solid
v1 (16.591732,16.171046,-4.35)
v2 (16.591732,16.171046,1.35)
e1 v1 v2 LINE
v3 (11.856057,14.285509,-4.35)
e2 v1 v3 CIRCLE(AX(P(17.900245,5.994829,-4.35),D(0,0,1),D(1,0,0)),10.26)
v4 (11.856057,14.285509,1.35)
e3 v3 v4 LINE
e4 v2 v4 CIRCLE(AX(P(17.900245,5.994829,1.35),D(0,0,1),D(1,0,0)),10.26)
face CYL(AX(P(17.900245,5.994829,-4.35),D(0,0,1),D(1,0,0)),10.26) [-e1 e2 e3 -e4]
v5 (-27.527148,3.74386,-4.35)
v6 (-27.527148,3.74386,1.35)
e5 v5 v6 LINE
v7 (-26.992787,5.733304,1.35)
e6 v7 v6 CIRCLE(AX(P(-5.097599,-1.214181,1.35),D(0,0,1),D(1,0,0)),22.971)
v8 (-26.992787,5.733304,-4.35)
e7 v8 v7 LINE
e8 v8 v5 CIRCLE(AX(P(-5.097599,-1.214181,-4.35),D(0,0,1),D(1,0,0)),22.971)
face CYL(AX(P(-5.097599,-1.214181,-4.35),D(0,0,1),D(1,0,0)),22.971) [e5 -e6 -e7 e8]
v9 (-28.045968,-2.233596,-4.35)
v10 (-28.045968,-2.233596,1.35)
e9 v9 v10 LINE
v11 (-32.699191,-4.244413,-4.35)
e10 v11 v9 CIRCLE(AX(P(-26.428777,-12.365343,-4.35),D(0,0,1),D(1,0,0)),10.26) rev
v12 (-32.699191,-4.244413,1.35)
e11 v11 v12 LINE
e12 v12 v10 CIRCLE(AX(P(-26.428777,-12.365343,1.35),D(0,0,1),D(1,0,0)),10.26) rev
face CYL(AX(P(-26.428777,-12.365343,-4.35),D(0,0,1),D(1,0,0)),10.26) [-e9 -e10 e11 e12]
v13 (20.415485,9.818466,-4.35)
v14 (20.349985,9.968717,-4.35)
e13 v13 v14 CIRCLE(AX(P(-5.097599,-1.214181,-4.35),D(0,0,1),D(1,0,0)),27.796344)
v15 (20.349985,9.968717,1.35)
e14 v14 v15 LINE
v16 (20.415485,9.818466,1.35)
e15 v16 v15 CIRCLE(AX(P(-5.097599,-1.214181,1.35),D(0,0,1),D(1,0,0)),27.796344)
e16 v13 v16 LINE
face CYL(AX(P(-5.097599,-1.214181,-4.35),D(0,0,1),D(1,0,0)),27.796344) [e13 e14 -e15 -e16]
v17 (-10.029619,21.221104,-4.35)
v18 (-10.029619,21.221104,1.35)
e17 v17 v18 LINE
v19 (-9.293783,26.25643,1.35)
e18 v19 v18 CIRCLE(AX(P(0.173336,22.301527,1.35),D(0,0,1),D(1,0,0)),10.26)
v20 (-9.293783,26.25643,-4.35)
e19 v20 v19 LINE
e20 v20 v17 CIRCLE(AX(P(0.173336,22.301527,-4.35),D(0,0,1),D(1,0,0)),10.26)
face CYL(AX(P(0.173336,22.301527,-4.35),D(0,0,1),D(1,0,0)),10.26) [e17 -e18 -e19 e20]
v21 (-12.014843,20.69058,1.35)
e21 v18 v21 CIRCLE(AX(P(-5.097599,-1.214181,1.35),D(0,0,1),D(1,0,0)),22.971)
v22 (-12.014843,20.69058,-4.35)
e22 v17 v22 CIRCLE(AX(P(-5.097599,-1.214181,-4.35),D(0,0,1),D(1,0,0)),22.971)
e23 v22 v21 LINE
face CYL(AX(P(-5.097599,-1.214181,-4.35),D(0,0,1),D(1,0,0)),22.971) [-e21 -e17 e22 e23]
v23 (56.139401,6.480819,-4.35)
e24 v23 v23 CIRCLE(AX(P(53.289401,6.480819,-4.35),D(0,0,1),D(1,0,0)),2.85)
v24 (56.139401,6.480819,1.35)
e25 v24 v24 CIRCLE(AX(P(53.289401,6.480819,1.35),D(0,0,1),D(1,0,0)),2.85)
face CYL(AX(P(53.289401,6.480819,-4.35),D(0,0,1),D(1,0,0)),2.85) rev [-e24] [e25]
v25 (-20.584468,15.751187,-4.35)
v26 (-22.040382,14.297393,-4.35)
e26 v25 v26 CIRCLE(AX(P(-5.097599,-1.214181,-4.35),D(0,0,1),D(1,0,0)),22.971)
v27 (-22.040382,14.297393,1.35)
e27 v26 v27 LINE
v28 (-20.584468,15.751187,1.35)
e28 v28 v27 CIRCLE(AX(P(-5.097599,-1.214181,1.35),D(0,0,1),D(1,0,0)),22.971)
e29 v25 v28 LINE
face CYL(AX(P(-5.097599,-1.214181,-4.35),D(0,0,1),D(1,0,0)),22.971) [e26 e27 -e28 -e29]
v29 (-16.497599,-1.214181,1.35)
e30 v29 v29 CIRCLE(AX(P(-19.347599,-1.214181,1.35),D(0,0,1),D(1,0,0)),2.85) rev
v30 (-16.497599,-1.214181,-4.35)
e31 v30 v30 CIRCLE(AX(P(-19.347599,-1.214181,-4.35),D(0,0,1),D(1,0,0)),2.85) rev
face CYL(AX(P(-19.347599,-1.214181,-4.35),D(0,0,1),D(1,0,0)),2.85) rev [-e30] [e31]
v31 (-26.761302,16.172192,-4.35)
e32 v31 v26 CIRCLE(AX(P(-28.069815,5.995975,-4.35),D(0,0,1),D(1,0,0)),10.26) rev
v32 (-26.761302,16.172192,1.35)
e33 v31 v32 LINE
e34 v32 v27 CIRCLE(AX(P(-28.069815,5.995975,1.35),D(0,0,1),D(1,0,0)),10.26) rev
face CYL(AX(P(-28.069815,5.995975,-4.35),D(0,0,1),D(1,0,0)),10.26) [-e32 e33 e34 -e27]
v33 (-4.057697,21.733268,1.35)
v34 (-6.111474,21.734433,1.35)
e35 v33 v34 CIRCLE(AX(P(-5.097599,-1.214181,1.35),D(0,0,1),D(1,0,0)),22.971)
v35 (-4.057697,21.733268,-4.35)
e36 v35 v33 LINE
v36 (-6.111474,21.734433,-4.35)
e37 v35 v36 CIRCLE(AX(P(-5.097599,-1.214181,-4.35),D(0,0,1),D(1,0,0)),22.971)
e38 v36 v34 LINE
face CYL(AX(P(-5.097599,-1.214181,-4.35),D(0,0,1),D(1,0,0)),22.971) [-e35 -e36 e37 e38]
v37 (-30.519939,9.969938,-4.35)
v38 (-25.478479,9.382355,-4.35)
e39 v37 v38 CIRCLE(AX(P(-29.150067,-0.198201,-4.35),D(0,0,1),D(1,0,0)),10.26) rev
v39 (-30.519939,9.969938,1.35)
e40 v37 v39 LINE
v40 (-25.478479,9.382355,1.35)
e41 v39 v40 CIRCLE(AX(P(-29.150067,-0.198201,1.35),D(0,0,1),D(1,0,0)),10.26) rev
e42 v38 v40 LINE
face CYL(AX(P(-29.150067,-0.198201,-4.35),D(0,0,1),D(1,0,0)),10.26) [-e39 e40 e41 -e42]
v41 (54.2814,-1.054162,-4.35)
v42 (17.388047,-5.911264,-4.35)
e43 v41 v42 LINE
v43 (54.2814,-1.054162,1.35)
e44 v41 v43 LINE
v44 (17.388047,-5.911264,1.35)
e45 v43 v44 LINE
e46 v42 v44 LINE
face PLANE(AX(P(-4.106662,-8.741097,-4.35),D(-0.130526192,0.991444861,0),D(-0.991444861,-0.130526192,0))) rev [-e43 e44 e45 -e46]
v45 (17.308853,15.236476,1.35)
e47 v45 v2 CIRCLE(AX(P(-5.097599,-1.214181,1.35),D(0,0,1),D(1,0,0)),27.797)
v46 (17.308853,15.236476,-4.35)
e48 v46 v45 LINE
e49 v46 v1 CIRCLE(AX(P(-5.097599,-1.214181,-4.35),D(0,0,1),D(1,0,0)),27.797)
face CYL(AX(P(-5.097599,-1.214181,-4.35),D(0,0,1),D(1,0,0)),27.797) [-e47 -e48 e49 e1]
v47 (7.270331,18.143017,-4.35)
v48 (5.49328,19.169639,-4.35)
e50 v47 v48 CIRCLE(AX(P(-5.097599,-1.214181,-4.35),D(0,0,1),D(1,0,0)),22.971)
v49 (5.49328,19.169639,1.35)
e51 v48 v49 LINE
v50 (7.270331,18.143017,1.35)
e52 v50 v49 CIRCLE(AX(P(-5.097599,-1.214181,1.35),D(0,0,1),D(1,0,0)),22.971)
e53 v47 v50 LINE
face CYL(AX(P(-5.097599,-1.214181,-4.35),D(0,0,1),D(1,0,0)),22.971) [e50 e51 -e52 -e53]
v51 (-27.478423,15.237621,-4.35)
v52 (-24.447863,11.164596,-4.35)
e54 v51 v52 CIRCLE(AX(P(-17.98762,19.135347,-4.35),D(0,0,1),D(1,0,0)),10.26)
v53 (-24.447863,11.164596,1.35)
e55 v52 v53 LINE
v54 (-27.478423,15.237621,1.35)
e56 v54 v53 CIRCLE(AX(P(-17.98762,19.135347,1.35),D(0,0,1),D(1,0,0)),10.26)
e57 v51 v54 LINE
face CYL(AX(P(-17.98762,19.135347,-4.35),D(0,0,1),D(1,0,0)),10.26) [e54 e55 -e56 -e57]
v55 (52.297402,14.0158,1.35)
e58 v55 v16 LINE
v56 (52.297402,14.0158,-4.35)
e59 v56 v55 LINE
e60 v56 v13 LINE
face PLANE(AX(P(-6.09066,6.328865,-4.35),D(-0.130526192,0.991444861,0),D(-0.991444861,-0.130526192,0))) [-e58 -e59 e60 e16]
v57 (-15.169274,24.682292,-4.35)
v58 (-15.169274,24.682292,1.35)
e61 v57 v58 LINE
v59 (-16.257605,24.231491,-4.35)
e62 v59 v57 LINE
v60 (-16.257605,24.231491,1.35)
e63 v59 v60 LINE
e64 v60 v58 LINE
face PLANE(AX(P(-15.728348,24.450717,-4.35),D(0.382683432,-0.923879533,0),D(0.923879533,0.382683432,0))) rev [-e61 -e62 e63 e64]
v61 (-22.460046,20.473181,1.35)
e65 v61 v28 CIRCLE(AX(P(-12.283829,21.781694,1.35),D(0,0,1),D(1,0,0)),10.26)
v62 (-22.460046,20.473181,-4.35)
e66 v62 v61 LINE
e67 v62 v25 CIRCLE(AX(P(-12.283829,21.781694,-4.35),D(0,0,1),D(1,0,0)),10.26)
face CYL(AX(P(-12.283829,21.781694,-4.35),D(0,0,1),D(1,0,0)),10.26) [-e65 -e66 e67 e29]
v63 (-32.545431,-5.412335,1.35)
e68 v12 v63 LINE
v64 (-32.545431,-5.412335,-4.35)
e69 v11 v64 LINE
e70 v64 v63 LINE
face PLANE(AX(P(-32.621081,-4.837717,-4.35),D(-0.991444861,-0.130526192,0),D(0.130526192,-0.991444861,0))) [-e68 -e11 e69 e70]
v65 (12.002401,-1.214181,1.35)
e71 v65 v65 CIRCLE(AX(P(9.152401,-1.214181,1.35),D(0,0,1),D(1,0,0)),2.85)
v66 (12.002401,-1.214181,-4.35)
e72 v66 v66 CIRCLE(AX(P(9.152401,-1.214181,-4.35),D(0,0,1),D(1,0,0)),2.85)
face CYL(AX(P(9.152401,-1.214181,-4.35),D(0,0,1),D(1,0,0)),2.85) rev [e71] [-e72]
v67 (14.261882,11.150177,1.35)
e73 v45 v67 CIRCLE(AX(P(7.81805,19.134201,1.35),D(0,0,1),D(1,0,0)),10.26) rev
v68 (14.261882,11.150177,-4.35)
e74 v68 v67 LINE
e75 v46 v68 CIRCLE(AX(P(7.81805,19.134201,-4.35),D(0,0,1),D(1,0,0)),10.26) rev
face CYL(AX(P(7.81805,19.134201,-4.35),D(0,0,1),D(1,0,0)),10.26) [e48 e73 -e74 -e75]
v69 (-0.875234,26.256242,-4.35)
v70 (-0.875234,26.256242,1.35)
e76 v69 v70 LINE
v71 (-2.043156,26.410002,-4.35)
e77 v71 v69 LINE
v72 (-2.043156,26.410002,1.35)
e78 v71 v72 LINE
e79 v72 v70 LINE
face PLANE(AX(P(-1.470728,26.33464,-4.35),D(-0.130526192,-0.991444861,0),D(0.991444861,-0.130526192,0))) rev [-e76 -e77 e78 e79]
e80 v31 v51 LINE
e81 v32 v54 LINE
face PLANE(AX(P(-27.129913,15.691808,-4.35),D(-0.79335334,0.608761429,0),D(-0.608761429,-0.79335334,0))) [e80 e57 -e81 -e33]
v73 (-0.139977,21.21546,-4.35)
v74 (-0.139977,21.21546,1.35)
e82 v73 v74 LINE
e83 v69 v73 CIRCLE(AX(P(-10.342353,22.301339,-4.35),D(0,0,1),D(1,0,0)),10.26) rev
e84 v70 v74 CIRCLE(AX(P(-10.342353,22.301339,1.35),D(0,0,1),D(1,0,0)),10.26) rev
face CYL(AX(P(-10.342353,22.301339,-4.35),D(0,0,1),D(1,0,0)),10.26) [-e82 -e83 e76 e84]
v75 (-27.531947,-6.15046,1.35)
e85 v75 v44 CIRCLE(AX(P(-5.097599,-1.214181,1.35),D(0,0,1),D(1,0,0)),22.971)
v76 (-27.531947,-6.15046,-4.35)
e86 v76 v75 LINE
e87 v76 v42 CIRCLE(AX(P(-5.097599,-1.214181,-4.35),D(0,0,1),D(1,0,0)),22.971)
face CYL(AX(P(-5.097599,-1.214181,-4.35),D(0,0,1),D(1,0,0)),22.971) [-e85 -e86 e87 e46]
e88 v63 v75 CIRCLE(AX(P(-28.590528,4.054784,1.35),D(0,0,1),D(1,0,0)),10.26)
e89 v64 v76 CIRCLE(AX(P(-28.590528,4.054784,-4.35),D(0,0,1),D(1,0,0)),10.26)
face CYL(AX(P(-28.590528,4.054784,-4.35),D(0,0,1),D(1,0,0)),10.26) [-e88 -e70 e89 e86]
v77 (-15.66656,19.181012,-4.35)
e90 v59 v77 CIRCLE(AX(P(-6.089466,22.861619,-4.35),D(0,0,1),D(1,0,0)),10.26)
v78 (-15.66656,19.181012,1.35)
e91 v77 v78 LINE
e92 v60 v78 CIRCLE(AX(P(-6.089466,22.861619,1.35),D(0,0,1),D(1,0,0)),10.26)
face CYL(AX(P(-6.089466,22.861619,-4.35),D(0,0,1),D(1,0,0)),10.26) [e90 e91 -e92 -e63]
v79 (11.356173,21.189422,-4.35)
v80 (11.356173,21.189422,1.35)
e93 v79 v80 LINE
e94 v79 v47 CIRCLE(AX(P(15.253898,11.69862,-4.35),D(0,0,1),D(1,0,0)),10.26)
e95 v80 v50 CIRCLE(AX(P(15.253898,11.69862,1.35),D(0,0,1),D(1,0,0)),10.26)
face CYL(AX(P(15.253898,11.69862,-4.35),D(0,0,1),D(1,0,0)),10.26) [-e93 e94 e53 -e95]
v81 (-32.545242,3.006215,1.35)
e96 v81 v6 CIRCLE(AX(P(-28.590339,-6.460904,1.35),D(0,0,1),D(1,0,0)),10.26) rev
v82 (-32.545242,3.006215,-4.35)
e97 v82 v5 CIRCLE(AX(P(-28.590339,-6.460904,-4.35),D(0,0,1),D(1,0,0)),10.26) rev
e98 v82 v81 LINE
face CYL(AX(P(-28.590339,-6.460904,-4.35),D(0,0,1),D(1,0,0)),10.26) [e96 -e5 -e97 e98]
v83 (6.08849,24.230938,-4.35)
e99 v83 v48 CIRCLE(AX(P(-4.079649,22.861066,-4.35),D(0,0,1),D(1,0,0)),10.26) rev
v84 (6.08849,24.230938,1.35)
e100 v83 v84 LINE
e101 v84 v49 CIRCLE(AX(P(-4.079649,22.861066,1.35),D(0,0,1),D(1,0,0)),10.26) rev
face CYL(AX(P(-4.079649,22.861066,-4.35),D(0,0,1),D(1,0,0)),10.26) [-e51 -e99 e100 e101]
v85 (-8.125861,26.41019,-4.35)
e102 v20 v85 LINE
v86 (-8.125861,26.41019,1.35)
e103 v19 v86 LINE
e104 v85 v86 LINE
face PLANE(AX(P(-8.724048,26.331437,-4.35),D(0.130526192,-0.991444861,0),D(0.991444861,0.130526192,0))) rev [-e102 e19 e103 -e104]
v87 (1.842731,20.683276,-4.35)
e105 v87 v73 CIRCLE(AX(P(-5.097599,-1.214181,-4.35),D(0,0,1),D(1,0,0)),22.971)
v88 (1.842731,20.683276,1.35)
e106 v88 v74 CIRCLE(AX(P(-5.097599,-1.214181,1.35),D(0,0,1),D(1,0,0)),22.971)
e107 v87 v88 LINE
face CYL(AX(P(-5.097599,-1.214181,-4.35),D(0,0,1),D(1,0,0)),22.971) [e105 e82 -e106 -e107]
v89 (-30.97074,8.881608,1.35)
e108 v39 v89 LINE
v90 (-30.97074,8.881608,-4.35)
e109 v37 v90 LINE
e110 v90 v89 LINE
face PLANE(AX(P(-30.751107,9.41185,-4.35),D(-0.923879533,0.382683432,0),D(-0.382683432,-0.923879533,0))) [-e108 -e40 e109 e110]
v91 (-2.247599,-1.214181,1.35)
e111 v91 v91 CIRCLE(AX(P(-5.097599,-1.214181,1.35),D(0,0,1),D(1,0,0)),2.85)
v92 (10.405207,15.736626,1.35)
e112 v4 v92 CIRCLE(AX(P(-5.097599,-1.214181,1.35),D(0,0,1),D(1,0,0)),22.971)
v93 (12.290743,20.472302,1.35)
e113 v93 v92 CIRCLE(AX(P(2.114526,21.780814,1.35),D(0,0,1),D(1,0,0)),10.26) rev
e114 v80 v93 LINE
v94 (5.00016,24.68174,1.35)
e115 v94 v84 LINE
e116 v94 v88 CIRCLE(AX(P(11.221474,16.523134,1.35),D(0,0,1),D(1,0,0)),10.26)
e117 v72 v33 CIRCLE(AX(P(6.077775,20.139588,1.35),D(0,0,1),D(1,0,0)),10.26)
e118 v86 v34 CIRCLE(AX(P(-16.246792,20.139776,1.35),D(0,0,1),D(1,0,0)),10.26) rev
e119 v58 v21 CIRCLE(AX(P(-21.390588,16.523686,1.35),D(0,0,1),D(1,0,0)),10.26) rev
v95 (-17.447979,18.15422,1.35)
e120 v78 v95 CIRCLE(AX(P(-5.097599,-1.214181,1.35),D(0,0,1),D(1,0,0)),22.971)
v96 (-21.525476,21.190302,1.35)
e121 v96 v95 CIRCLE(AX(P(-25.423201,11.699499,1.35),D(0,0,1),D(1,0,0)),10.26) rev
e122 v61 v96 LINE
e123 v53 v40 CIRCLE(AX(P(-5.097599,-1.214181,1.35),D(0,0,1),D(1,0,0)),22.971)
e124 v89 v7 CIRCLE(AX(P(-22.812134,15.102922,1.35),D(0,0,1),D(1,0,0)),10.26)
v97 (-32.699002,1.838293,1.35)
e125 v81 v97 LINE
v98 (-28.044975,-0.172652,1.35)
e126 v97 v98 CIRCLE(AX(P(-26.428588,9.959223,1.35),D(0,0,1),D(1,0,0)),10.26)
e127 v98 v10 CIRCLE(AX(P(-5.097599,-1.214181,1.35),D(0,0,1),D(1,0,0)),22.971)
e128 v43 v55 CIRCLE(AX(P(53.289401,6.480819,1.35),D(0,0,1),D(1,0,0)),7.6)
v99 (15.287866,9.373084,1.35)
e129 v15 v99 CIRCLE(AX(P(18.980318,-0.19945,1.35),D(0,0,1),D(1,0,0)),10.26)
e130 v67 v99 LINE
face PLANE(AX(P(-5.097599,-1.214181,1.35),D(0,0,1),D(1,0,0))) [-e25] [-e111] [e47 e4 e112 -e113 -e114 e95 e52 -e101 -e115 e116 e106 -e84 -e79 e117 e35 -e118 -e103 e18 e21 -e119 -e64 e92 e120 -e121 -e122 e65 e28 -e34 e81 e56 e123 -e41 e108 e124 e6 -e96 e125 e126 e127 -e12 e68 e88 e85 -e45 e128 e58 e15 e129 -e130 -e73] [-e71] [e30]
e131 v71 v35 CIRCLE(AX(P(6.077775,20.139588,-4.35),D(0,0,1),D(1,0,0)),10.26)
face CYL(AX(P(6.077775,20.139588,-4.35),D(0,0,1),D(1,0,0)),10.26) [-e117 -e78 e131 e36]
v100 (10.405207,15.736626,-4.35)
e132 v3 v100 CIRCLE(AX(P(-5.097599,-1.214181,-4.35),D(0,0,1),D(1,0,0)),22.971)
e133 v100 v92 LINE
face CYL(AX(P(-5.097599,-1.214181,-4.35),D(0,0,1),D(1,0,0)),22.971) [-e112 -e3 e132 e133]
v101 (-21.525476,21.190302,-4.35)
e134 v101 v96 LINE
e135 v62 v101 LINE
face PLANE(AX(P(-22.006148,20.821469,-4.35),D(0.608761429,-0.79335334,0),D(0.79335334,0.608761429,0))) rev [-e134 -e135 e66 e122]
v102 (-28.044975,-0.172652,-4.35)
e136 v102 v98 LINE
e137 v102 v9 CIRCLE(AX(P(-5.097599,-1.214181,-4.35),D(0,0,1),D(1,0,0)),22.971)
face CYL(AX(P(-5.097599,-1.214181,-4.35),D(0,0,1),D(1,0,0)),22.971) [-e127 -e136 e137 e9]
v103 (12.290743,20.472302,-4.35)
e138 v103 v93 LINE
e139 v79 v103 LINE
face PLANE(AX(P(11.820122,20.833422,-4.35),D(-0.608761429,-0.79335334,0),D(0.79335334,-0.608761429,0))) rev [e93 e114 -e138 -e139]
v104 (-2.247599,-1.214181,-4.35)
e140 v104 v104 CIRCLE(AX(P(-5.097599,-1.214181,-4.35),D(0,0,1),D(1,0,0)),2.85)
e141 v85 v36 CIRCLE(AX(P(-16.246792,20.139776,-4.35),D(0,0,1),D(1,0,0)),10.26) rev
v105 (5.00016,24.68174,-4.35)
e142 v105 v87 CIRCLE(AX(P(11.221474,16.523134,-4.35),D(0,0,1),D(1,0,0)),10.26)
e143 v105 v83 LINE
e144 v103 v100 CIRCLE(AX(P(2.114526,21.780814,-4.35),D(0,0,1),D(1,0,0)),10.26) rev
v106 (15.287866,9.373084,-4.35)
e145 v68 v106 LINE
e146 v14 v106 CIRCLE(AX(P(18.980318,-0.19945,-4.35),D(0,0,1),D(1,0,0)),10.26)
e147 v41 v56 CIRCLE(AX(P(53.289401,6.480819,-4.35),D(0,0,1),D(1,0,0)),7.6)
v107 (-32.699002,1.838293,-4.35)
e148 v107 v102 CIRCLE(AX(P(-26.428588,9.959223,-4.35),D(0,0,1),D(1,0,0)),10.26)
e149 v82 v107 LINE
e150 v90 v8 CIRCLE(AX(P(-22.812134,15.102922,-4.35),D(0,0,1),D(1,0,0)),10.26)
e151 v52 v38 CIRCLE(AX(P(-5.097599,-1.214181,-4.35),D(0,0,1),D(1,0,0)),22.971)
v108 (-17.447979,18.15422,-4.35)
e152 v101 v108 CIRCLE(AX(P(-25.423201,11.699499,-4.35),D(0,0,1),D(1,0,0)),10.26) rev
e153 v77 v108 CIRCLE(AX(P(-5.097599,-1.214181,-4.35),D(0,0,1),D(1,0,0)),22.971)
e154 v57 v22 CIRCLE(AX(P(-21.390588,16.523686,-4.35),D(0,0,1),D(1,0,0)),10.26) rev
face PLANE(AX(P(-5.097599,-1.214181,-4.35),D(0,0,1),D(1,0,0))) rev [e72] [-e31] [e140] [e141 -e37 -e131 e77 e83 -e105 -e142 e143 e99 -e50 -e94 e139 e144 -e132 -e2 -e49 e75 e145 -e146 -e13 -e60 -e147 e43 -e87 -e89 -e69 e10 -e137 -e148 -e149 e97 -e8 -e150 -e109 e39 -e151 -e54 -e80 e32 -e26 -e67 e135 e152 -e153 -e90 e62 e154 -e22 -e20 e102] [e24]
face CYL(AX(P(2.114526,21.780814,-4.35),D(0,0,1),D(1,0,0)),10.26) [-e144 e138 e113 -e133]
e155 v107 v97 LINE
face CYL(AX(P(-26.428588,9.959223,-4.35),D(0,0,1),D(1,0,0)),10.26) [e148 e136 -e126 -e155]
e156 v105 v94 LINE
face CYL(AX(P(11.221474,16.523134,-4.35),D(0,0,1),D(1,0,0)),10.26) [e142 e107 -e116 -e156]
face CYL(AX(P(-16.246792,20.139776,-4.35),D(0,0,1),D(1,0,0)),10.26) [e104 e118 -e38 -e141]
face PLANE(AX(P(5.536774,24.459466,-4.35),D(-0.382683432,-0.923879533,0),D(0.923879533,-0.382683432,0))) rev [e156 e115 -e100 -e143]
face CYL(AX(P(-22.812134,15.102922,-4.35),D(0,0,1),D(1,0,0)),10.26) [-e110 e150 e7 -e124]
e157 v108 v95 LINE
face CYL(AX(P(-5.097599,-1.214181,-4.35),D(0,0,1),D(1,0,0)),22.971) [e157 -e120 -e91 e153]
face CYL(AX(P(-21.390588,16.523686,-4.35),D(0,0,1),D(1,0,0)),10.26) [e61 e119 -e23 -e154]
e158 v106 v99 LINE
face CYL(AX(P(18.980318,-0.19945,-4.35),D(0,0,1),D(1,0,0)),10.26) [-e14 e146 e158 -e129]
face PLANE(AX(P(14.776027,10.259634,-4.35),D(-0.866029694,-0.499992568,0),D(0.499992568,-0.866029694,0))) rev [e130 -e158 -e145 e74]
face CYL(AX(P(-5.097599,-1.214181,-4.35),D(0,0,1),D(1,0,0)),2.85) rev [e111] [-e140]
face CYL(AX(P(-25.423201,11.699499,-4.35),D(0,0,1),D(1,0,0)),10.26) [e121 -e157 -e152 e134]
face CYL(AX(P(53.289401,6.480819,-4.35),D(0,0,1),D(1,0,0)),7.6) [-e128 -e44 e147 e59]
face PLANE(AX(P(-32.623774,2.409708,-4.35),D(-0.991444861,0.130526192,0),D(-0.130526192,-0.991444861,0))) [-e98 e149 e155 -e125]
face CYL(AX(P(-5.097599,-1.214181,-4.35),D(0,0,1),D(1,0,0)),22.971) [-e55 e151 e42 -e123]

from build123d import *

# Parameters (mm, degrees)
BOSS_EXTRUDE1_START     = -3
BOSS_EXTRUDE1_OUTLINE_R = 1.5
BOSS_EXTRUDE1_DEPTH     = 3
SCALE1_SCALE            = 1.9


# Read off the part's stored shape, not the designer's step: Boss-Extrude1
with BuildPart() as part:
    # Boss-Extrude1 outline → Boss-Extrude1 (new body)
    with BuildSketch(Plane.XY.offset(BOSS_EXTRUDE1_START)):
        with BuildLine():
            Line((11.834550238, -2.472148997), (31.252104769, 0.084220555))
            ThreePointArc((31.252104769, 0.084220555), (34.695779445, 4.572104769), (30.207895231, 8.015779445))
            Line((30.207895231, 8.015779445), (13.427938823, 5.806656275))
            ThreePointArc((13.427938823, 5.806656275), (13.410760304, 5.846221532), (13.393465207, 5.885735968))
            ThreePointArc((13.393465207, 5.885735968), (12.041551488, 5.897071585), (10.729192217, 5.572244952))
            Line((10.729192217, 5.572244952), (10.189200244, 6.507557022))
            ThreePointArc((10.189200244, 6.507557022), (11.126720661, 7.481723913), (11.792869471, 8.658240563))
            ThreePointArc((11.792869471, 8.658240563), (11.606759368, 8.906179706), (11.415437385, 9.150119633))
            ThreePointArc((11.415437385, 9.150119633), (10.106597569, 8.81117421), (8.922976471, 8.15773197))
            ThreePointArc((8.922976471, 8.15773197), (8.549706323, 8.548135574), (8.159371308, 8.921477448))
            ThreePointArc((8.159371308, 8.921477448), (8.812813548, 10.105098546), (9.151758972, 11.413938362))
            Line((9.151758972, 11.413938362), (8.659879901, 11.791370448))
            ThreePointArc((8.659879901, 11.791370448), (7.483516811, 11.125336137), (6.509436976, 10.187999326))
            ThreePointArc((6.509436976, 10.187999326), (6.047829045, 10.468613272), (5.574146563, 10.728326528))
            ThreePointArc((5.574146563, 10.728326528), (5.898805358, 12.040487702), (5.887415057, 13.392168338))
            Line((5.887415057, 13.392168338), (5.314609747, 13.629432066))
            ThreePointArc((5.314609747, 13.629432066), (4.351003751, 12.681995862), (3.65280527, 11.524977816))
            ThreePointArc((3.65280527, 11.524977816), (3.134170467, 11.676689406), (2.609274564, 11.805074597))
            ThreePointArc((2.609274564, 11.805074597), (2.58305967, 13.15599481), (2.222297371, 14.458117388))
            Line((2.222297371, 14.458117388), (1.607601557, 14.539043627))
            ThreePointArc((1.607601557, 14.539043627), (0.922327421, 13.375148622), (0.547316802, 12.077605074))
            ThreePointArc((0.547316802, 12.077605074), (0.006856042, 12.089998056), (-0.533618427, 12.078218055))
            ThreePointArc((-0.533618427, 12.078218055), (-0.908651119, 13.375486662), (-1.593822374, 14.539142845))
            Line((-1.593822374, 14.539142845), (-2.208518188, 14.458216606))
            ThreePointArc((-2.208518188, 14.458216606), (-2.569071942, 13.157522433), (-2.595800172, 11.808044777))
            ThreePointArc((-2.595800172, 11.808044777), (-3.121351418, 11.680122659), (-3.640655008, 11.528821757))
            ThreePointArc((-3.640655008, 11.528821757), (-4.338480819, 12.683812024), (-5.300881923, 13.629722958))
            Line((-5.300881923, 13.629722958), (-5.873687233, 13.39245923))
            ThreePointArc((-5.873687233, 13.39245923), (-5.885433032, 12.043808909), (-5.562611018, 10.734312212))
            ThreePointArc((-5.562611018, 10.734312212), (-6.037455135, 10.474599539), (-6.500199913, 10.193895285))
            ThreePointArc((-6.500199913, 10.193895285), (-7.47268922, 11.127885908), (-8.646251294, 11.791833189))
            Line((-8.646251294, 11.791833189), (-9.138130365, 11.414401103))
            ThreePointArc((-9.138130365, 11.414401103), (-8.80083054, 10.109699304), (-8.150983569, 8.92914144))
            ThreePointArc((-8.150983569, 8.92914144), (-8.542690029, 8.555147402), (-8.917254459, 8.163986338))
            ThreePointArc((-8.917254459, 8.163986338), (-10.097571821, 8.813551755), (-11.401949093, 9.15072269))
            Line((-11.401949093, 9.15072269), (-11.779381179, 8.658843619))
            ThreePointArc((-11.779381179, 8.658843619), (-11.116550367, 7.486781519), (-10.184349411, 6.515145975))
            ThreePointArc((-10.184349411, 6.515145975), (-10.46607819, 6.052215075), (-10.726778871, 5.577124264))
            ThreePointArc((-10.726778871, 5.577124264), (-12.034053776, 5.89841947), (-13.38017907, 5.886378776))
            Line((-13.38017907, 5.886378776), (-13.617442798, 5.313573465))
            ThreePointArc((-13.617442798, 5.313573465), (-12.674640857, 4.353631081), (-11.523783462, 3.656571444))
            ThreePointArc((-11.523783462, 3.656571444), (-11.67614775, 3.13618777), (-11.805025713, 2.60949572))
            ThreePointArc((-11.805025713, 2.60949572), (-13.149945407, 2.581153618), (-14.44612812, 2.221261089))
            Line((-14.44612812, 2.221261089), (-14.527054359, 1.606565275))
            ThreePointArc((-14.527054359, 1.606565275), (-13.368714152, 0.923687604), (-12.07756623, 0.548173302))
            ThreePointArc((-12.07756623, 0.548173302), (-12.089998597, 0.005825389), (-12.07808888, -0.536534252))
            ThreePointArc((-12.07808888, -0.536534252), (-13.369010177, -0.912066026), (-14.527153576, -1.594858655))
            Line((-14.527153576, -1.594858655), (-14.446227337, -2.20955447))
            ThreePointArc((-14.446227337, -2.20955447), (-13.151251636, -2.569269431), (-11.807551859, -2.598041398))
            ThreePointArc((-11.807551859, -2.598041398), (0.06437742, -12.089828599), (11.834550238, -2.472148997))
        make_face()
        with Locations((-7.5, 0)):
            Circle(BOSS_EXTRUDE1_OUTLINE_R, mode=Mode.SUBTRACT)
        Circle(BOSS_EXTRUDE1_OUTLINE_R, mode=Mode.SUBTRACT)
        with Locations((7.5, 0)):
            Circle(BOSS_EXTRUDE1_OUTLINE_R, mode=Mode.SUBTRACT)
        with Locations((30.73, 4.05)):
            Circle(BOSS_EXTRUDE1_OUTLINE_R, mode=Mode.SUBTRACT)
    extrude(amount=BOSS_EXTRUDE1_DEPTH)


with BuildPart() as part_1:
    # Scale1: scaled about (5.663998646, 1.349090427, -1.5)
    add(part.part.scale(SCALE1_SCALE).moved(Location((-5.097598781, -1.214181384, 1.35))))


solid = part_1.part
